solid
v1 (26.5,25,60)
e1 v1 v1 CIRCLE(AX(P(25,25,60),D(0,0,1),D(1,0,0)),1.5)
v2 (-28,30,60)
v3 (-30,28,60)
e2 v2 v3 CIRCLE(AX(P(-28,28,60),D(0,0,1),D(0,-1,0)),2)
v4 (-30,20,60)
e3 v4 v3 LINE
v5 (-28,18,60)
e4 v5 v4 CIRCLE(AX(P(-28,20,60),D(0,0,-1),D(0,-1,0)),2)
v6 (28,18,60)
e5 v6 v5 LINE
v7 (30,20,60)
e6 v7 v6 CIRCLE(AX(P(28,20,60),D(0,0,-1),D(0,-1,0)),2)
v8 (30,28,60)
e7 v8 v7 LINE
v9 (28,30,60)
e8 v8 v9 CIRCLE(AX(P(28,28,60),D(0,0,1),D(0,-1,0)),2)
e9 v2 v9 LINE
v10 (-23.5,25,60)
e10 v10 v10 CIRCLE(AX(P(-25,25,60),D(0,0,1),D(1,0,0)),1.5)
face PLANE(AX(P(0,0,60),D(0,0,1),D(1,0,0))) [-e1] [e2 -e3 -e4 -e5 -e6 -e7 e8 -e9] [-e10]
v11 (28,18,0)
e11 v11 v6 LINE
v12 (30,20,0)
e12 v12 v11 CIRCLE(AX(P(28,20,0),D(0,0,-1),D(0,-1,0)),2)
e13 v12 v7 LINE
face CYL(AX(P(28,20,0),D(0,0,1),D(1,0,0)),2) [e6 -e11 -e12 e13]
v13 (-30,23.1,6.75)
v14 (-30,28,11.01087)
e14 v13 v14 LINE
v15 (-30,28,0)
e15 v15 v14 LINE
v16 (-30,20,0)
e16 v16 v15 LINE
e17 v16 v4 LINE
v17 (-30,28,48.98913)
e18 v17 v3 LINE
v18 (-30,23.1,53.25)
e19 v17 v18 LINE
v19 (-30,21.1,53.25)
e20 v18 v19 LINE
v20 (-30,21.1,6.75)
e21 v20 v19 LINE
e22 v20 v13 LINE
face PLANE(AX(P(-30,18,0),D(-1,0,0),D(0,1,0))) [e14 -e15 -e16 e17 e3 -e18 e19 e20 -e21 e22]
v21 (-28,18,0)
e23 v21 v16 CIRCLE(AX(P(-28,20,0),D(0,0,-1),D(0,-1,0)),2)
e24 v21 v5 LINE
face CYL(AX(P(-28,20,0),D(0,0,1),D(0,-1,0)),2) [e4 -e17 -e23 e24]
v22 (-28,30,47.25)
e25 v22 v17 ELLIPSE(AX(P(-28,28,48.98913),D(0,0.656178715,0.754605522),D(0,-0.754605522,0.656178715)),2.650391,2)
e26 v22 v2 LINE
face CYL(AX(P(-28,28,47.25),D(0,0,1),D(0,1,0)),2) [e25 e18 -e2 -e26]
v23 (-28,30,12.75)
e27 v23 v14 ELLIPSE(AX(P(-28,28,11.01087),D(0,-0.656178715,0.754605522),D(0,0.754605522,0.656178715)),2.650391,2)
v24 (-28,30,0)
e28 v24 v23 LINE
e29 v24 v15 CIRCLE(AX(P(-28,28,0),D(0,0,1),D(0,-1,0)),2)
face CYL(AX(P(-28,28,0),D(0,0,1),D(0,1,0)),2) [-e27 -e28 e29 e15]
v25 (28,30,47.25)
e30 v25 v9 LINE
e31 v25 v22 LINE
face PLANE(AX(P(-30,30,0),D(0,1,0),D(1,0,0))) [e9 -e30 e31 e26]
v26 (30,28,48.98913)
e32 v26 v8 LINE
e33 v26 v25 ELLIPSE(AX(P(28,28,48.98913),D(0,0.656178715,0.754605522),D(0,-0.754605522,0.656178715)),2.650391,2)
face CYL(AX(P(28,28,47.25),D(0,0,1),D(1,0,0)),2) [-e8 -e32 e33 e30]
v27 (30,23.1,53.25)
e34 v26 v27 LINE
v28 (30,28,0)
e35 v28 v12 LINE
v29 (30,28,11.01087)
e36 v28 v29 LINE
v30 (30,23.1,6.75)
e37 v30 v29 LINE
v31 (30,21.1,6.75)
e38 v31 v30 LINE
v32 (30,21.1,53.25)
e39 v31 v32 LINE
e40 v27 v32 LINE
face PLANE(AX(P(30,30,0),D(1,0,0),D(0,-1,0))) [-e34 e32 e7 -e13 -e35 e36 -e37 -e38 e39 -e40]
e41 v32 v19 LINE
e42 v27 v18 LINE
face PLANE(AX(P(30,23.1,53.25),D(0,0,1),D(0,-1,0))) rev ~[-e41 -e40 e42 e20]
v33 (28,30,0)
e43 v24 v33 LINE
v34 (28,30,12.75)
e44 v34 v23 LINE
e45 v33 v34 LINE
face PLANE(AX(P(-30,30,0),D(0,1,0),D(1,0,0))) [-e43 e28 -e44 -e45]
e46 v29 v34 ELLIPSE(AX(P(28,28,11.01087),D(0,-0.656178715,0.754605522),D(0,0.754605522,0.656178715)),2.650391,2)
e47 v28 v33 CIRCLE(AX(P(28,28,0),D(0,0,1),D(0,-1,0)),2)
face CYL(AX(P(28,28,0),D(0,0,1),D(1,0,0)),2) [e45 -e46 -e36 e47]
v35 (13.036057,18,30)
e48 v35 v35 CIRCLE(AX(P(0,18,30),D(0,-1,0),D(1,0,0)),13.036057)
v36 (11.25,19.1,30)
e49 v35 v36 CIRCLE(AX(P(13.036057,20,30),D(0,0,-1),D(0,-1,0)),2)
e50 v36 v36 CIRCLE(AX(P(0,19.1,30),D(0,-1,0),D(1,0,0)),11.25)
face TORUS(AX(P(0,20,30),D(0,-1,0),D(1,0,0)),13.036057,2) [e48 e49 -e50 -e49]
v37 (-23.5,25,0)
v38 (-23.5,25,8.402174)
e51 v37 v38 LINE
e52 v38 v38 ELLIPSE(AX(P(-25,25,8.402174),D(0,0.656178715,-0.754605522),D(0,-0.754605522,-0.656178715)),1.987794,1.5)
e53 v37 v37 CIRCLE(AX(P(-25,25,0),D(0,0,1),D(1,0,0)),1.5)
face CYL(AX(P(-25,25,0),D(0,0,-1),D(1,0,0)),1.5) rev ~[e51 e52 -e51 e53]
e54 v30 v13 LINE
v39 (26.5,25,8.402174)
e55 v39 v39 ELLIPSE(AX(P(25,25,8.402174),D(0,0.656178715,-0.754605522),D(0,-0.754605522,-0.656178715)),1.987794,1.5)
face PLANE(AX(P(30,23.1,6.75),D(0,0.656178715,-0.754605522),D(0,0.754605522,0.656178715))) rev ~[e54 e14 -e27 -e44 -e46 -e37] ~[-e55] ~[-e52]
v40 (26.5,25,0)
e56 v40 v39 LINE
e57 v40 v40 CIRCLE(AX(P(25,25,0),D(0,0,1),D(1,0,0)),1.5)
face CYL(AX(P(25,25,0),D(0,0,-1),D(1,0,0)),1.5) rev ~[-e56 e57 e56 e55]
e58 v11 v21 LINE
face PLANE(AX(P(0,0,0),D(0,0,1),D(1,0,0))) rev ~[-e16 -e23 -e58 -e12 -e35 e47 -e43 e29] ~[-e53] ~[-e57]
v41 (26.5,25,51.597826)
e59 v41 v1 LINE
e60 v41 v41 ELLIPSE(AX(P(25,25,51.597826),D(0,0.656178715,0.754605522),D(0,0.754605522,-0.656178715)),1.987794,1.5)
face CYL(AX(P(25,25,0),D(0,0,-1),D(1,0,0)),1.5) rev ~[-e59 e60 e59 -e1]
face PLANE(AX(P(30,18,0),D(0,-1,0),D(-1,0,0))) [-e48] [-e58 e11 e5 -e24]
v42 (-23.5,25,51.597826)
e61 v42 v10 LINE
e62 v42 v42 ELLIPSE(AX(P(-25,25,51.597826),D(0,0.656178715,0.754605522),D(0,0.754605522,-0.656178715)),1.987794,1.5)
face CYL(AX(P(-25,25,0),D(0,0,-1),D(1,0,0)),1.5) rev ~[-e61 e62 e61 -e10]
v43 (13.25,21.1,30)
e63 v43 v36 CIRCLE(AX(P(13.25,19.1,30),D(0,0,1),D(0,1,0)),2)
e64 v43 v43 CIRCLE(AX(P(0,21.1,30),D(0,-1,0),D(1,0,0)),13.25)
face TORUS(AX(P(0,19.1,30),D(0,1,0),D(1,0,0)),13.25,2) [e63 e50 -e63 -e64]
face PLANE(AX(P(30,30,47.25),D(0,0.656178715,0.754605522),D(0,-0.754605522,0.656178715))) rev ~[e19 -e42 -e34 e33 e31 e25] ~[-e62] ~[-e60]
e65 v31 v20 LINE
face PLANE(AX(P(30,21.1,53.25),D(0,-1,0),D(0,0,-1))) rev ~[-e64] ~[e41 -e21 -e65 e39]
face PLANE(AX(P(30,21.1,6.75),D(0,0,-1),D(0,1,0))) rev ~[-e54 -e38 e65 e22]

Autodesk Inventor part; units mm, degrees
ref_plane "YZ Plane" through (0, 0, 0) normal (1, 0, 0) x (0, 1, 0)
ref_plane "XZ Plane" through (0, 0, 0) normal (0, 1, 0) x (-1, 0, 0)
ref_plane "XY Plane" through (0, 0, 0) normal (0, 0, 1) x (1, 0, 0)
sketch "Sketch1" plane through (0, 0, 0) normal (0, 0, 1) x (1, 0, 0)
  line L0 (30, -30) -> (30, 30)
  line L1 (30, 30) -> (-30, 30)
  line L2 (-30, 30) -> (-30, -30)
  line L3 (-30, -30) -> (30, 30) construction
  line L4 (30, -30) -> (-30, 30) construction
  line L5 (30, 30) -> (25, 30) construction
  line L6 (25, 30) -> (25, 25) construction
  line L7 (-30, 30) -> (-25, 30) construction
  line L8 (-25, 30) -> (-25, 25) construction
  line L9 (-30, -30) -> (-30, -25) construction
  line L10 (-30, -25) -> (-25, -25) construction
  line L11 (30, -30) -> (30, -25) construction
  line L12 (30, -25) -> (25, -25) construction
  circle A0 centre (-25, 25) radius 1.5
  circle A1 centre (25, 25) radius 1.5
  circle A2 centre (25, -25) radius 1.5
  circle A3 centre (-25, -25) radius 1.5
  line L13 (30, 30) -> (30, 18) construction
  line L14 (30, 18) -> (-30, 18)
  point P0 (0, 0)
  dimension "d0" = 60
  dimension "d1" = 60
  dimension "d2" = 5
  dimension "d3" = 5
  dimension "d4" = 5
  dimension "d5" = 5
  dimension "d6" = 5
  dimension "d7" = 5
  dimension "d8" = 5
  dimension "d9" = 5
  dimension "d10" = 3
  dimension "d11" = 3
  dimension "d12" = 3
  dimension "d13" = 3
  dimension "d46" = 12
sketch "Sketch1 outline for Block" plane through (0, 0, 0) normal (0, 0, 1) x (1, 0, 0)
  line L0 (30, 30) -> (30, 18)
  line L1 (-30, 30) -> (30, 30)
  line L2 (30, 18) -> (-30, 18)
  line L3 (-30, 18) -> (-30, 30)
  circle A0 centre (-25, 25) radius 1.5
  circle A1 centre (25, 25) radius 1.5
extrude "Block" add sketch "Sketch1 outline for Block" along normal blind 60
sketch "Sketch2" plane through (30, -30, 0) normal (1, 0, 0) x (0, 0, -1)
  line L0 (0, 60) -> (-60, 60) projected
  line L1 (-30, 60) -> (-12.75, 60)
  line L2 (-30, 60) -> (-47.25, 60)
  line L3 (-30, 60) -> (-30, 51.1) construction
  line L4 (-30, 51.1) -> (-6.75, 51.1)
  line L5 (-30, 51.1) -> (-53.25, 51.1)
  line L6 (-53.25, 51.1) -> (-53.25, 53.1)
  line L7 (-6.75, 51.1) -> (-6.75, 53.1)
  line L8 (-6.75, 53.1) -> (-12.75, 60)
  line L9 (-53.25, 53.1) -> (-47.25, 60)
  point P0 (0, 30)
  dimension "d17" = 17.25
  dimension "d18" = 17.25
  dimension "d19" = 8.9
  dimension "d20" = 23.25
  dimension "d21" = 23.25
  dimension "d22" = 2
  dimension "d23" = 2
sketch "Sketch2 outline for Tripod Slot" plane through (30, -30, 0) normal (1, 0, 0) x (0, 0, -1)
  line L0 (-12.75, 60) -> (-30, 60)
  line L1 (-6.75, 53.1) -> (-12.75, 60)
  line L2 (-6.75, 51.1) -> (-6.75, 53.1)
  line L3 (-30, 51.1) -> (-6.75, 51.1)
  line L4 (-53.25, 51.1) -> (-30, 51.1)
  line L5 (-53.25, 53.1) -> (-53.25, 51.1)
  line L6 (-47.25, 60) -> (-53.25, 53.1)
  line L7 (-30, 60) -> (-47.25, 60)
extrude "Tripod Slot" cut sketch "Sketch2 outline for Tripod Slot" against normal blind 60
sketch "Sketch3" plane through (0, 0, 60) normal (0, 0, 1) x (1, 0, 0)
  circle A0 centre (-25, -25) radius 1.5 construction
  line L0 (-25, -25) -> (-25, -20) construction
  line L1 (-25, -25) -> (-20, -25) construction
  line L2 (25.138807, -25) -> (25.138807, -20) construction
  line L3 (25.138807, -25) -> (30.138807, -25) construction
  line L4 (-25, 24.966147) -> (-25, 17.466147) construction
  line L5 (-25, 24.966147) -> (-17.5, 24.966147) construction
  line L6 (25.138807, 24.966147) -> (25.138807, 17.466147) construction
  line L7 (25.138807, 24.966147) -> (32.638807, 24.966147) construction
  line L8 (25.138807, 17.466147) -> (30, 17.466147) construction
  line L9 (30, 30) -> (30, 18) construction
  line L10 (-25, 17.466147) -> (-30, 17.466147) construction
  line L11 (-30, 30) -> (-30, 18) construction
  line L12 (-25, -20) -> (-30, -20) construction
  line L13 (25.138807, -20) -> (30, -20) construction
  line L14 (30, 17.466147) -> (5, 17.466147)
  line L15 (30, -20) -> (5, -20)
  line L16 (5, -20) -> (5, 17.466147)
  line L17 (-30, 17.466147) -> (-5, 17.466147)
  line L18 (-30, -20) -> (-5, -20)
  line L19 (-5, -20) -> (-5, 17.466147)
  line L20 (-30, 17.466147) -> (-30, -20)
  line L21 (30, 17.466147) -> (30, -20)
  point P0 (0, 0)
  point P1 (30, -30)
  point P2 (-30, -30)
  dimension "d26" = 5
  dimension "d27" = 90
  dimension "d28" = 5
  dimension "d29" = 90
  dimension "d30" = 7.5
  dimension "d31" = 90
  dimension "d32" = 7.5
  dimension "d33" = 90
  dimension "d34" = 25
  dimension "d35" = 25
  dimension "d36" = 25
  dimension "d37" = 25
  dimension "d38" = 90
  dimension "d39" = 90
  dimension "d40" = 4.86119
  dimension "d41" = 4.86119
  dimension "d42" = 55
sketch "Sketch3 outline for Plastic Thinning" plane through (0, 0, 60) normal (0, 0, 1) x (1, 0, 0)
  line L0 (30, -20) -> (30, 17.466147)
  line L1 (5, -20) -> (30, -20)
  line L2 (5, 17.466147) -> (5, -20)
  line L3 (30, 17.466147) -> (5, 17.466147)
  line L4 (-30, 17.466147) -> (-5, 17.466147)
  line L5 (-5, 17.466147) -> (-5, -20)
  line L6 (-5, -20) -> (-30, -20)
  line L7 (-30, -20) -> (-30, 17.466147)
extrude "Plastic Thinning" cut sketch "Sketch3 outline for Plastic Thinning" against normal blind 60
fillet "Strength" [suppressed]
fillet "Fillet3" radius 2 6 edges at (30, 18, 30) (30, 30, 6.375) (30, 30, 53.625) (-30, 18, 30) (-30, 30, 6.375) (-30, 30, 53.625)
sketch "Sketch4" plane through (-28, 18, 0) normal (0, -1, 0) x (1, 0, 0)
  line L0 (56, 60) -> (0, 60) construction
  line L1 (0, 0) -> (56, 0) construction
  line L2 (0, 60) -> (56, 0) construction
  circle A0 centre (28, 30) radius 11.25
  point P0 (28, 0)
  dimension "d48" = 22.5
sketch "Sketch4 outline for Extrusion4" plane through (-28, 18, 0) normal (0, -1, 0) x (1, 0, 0)
  circle A0 centre (28, 30) radius 11.25
extrude "Extrusion4" cut sketch "Sketch4 outline for Extrusion4" against normal blind 12.25
fillet "Fillet4" radius 2 2 edges at (-11.25, 21.1, 30) (-11.25, 18, 30)
properties part number "60x60CameraMountSlim"
